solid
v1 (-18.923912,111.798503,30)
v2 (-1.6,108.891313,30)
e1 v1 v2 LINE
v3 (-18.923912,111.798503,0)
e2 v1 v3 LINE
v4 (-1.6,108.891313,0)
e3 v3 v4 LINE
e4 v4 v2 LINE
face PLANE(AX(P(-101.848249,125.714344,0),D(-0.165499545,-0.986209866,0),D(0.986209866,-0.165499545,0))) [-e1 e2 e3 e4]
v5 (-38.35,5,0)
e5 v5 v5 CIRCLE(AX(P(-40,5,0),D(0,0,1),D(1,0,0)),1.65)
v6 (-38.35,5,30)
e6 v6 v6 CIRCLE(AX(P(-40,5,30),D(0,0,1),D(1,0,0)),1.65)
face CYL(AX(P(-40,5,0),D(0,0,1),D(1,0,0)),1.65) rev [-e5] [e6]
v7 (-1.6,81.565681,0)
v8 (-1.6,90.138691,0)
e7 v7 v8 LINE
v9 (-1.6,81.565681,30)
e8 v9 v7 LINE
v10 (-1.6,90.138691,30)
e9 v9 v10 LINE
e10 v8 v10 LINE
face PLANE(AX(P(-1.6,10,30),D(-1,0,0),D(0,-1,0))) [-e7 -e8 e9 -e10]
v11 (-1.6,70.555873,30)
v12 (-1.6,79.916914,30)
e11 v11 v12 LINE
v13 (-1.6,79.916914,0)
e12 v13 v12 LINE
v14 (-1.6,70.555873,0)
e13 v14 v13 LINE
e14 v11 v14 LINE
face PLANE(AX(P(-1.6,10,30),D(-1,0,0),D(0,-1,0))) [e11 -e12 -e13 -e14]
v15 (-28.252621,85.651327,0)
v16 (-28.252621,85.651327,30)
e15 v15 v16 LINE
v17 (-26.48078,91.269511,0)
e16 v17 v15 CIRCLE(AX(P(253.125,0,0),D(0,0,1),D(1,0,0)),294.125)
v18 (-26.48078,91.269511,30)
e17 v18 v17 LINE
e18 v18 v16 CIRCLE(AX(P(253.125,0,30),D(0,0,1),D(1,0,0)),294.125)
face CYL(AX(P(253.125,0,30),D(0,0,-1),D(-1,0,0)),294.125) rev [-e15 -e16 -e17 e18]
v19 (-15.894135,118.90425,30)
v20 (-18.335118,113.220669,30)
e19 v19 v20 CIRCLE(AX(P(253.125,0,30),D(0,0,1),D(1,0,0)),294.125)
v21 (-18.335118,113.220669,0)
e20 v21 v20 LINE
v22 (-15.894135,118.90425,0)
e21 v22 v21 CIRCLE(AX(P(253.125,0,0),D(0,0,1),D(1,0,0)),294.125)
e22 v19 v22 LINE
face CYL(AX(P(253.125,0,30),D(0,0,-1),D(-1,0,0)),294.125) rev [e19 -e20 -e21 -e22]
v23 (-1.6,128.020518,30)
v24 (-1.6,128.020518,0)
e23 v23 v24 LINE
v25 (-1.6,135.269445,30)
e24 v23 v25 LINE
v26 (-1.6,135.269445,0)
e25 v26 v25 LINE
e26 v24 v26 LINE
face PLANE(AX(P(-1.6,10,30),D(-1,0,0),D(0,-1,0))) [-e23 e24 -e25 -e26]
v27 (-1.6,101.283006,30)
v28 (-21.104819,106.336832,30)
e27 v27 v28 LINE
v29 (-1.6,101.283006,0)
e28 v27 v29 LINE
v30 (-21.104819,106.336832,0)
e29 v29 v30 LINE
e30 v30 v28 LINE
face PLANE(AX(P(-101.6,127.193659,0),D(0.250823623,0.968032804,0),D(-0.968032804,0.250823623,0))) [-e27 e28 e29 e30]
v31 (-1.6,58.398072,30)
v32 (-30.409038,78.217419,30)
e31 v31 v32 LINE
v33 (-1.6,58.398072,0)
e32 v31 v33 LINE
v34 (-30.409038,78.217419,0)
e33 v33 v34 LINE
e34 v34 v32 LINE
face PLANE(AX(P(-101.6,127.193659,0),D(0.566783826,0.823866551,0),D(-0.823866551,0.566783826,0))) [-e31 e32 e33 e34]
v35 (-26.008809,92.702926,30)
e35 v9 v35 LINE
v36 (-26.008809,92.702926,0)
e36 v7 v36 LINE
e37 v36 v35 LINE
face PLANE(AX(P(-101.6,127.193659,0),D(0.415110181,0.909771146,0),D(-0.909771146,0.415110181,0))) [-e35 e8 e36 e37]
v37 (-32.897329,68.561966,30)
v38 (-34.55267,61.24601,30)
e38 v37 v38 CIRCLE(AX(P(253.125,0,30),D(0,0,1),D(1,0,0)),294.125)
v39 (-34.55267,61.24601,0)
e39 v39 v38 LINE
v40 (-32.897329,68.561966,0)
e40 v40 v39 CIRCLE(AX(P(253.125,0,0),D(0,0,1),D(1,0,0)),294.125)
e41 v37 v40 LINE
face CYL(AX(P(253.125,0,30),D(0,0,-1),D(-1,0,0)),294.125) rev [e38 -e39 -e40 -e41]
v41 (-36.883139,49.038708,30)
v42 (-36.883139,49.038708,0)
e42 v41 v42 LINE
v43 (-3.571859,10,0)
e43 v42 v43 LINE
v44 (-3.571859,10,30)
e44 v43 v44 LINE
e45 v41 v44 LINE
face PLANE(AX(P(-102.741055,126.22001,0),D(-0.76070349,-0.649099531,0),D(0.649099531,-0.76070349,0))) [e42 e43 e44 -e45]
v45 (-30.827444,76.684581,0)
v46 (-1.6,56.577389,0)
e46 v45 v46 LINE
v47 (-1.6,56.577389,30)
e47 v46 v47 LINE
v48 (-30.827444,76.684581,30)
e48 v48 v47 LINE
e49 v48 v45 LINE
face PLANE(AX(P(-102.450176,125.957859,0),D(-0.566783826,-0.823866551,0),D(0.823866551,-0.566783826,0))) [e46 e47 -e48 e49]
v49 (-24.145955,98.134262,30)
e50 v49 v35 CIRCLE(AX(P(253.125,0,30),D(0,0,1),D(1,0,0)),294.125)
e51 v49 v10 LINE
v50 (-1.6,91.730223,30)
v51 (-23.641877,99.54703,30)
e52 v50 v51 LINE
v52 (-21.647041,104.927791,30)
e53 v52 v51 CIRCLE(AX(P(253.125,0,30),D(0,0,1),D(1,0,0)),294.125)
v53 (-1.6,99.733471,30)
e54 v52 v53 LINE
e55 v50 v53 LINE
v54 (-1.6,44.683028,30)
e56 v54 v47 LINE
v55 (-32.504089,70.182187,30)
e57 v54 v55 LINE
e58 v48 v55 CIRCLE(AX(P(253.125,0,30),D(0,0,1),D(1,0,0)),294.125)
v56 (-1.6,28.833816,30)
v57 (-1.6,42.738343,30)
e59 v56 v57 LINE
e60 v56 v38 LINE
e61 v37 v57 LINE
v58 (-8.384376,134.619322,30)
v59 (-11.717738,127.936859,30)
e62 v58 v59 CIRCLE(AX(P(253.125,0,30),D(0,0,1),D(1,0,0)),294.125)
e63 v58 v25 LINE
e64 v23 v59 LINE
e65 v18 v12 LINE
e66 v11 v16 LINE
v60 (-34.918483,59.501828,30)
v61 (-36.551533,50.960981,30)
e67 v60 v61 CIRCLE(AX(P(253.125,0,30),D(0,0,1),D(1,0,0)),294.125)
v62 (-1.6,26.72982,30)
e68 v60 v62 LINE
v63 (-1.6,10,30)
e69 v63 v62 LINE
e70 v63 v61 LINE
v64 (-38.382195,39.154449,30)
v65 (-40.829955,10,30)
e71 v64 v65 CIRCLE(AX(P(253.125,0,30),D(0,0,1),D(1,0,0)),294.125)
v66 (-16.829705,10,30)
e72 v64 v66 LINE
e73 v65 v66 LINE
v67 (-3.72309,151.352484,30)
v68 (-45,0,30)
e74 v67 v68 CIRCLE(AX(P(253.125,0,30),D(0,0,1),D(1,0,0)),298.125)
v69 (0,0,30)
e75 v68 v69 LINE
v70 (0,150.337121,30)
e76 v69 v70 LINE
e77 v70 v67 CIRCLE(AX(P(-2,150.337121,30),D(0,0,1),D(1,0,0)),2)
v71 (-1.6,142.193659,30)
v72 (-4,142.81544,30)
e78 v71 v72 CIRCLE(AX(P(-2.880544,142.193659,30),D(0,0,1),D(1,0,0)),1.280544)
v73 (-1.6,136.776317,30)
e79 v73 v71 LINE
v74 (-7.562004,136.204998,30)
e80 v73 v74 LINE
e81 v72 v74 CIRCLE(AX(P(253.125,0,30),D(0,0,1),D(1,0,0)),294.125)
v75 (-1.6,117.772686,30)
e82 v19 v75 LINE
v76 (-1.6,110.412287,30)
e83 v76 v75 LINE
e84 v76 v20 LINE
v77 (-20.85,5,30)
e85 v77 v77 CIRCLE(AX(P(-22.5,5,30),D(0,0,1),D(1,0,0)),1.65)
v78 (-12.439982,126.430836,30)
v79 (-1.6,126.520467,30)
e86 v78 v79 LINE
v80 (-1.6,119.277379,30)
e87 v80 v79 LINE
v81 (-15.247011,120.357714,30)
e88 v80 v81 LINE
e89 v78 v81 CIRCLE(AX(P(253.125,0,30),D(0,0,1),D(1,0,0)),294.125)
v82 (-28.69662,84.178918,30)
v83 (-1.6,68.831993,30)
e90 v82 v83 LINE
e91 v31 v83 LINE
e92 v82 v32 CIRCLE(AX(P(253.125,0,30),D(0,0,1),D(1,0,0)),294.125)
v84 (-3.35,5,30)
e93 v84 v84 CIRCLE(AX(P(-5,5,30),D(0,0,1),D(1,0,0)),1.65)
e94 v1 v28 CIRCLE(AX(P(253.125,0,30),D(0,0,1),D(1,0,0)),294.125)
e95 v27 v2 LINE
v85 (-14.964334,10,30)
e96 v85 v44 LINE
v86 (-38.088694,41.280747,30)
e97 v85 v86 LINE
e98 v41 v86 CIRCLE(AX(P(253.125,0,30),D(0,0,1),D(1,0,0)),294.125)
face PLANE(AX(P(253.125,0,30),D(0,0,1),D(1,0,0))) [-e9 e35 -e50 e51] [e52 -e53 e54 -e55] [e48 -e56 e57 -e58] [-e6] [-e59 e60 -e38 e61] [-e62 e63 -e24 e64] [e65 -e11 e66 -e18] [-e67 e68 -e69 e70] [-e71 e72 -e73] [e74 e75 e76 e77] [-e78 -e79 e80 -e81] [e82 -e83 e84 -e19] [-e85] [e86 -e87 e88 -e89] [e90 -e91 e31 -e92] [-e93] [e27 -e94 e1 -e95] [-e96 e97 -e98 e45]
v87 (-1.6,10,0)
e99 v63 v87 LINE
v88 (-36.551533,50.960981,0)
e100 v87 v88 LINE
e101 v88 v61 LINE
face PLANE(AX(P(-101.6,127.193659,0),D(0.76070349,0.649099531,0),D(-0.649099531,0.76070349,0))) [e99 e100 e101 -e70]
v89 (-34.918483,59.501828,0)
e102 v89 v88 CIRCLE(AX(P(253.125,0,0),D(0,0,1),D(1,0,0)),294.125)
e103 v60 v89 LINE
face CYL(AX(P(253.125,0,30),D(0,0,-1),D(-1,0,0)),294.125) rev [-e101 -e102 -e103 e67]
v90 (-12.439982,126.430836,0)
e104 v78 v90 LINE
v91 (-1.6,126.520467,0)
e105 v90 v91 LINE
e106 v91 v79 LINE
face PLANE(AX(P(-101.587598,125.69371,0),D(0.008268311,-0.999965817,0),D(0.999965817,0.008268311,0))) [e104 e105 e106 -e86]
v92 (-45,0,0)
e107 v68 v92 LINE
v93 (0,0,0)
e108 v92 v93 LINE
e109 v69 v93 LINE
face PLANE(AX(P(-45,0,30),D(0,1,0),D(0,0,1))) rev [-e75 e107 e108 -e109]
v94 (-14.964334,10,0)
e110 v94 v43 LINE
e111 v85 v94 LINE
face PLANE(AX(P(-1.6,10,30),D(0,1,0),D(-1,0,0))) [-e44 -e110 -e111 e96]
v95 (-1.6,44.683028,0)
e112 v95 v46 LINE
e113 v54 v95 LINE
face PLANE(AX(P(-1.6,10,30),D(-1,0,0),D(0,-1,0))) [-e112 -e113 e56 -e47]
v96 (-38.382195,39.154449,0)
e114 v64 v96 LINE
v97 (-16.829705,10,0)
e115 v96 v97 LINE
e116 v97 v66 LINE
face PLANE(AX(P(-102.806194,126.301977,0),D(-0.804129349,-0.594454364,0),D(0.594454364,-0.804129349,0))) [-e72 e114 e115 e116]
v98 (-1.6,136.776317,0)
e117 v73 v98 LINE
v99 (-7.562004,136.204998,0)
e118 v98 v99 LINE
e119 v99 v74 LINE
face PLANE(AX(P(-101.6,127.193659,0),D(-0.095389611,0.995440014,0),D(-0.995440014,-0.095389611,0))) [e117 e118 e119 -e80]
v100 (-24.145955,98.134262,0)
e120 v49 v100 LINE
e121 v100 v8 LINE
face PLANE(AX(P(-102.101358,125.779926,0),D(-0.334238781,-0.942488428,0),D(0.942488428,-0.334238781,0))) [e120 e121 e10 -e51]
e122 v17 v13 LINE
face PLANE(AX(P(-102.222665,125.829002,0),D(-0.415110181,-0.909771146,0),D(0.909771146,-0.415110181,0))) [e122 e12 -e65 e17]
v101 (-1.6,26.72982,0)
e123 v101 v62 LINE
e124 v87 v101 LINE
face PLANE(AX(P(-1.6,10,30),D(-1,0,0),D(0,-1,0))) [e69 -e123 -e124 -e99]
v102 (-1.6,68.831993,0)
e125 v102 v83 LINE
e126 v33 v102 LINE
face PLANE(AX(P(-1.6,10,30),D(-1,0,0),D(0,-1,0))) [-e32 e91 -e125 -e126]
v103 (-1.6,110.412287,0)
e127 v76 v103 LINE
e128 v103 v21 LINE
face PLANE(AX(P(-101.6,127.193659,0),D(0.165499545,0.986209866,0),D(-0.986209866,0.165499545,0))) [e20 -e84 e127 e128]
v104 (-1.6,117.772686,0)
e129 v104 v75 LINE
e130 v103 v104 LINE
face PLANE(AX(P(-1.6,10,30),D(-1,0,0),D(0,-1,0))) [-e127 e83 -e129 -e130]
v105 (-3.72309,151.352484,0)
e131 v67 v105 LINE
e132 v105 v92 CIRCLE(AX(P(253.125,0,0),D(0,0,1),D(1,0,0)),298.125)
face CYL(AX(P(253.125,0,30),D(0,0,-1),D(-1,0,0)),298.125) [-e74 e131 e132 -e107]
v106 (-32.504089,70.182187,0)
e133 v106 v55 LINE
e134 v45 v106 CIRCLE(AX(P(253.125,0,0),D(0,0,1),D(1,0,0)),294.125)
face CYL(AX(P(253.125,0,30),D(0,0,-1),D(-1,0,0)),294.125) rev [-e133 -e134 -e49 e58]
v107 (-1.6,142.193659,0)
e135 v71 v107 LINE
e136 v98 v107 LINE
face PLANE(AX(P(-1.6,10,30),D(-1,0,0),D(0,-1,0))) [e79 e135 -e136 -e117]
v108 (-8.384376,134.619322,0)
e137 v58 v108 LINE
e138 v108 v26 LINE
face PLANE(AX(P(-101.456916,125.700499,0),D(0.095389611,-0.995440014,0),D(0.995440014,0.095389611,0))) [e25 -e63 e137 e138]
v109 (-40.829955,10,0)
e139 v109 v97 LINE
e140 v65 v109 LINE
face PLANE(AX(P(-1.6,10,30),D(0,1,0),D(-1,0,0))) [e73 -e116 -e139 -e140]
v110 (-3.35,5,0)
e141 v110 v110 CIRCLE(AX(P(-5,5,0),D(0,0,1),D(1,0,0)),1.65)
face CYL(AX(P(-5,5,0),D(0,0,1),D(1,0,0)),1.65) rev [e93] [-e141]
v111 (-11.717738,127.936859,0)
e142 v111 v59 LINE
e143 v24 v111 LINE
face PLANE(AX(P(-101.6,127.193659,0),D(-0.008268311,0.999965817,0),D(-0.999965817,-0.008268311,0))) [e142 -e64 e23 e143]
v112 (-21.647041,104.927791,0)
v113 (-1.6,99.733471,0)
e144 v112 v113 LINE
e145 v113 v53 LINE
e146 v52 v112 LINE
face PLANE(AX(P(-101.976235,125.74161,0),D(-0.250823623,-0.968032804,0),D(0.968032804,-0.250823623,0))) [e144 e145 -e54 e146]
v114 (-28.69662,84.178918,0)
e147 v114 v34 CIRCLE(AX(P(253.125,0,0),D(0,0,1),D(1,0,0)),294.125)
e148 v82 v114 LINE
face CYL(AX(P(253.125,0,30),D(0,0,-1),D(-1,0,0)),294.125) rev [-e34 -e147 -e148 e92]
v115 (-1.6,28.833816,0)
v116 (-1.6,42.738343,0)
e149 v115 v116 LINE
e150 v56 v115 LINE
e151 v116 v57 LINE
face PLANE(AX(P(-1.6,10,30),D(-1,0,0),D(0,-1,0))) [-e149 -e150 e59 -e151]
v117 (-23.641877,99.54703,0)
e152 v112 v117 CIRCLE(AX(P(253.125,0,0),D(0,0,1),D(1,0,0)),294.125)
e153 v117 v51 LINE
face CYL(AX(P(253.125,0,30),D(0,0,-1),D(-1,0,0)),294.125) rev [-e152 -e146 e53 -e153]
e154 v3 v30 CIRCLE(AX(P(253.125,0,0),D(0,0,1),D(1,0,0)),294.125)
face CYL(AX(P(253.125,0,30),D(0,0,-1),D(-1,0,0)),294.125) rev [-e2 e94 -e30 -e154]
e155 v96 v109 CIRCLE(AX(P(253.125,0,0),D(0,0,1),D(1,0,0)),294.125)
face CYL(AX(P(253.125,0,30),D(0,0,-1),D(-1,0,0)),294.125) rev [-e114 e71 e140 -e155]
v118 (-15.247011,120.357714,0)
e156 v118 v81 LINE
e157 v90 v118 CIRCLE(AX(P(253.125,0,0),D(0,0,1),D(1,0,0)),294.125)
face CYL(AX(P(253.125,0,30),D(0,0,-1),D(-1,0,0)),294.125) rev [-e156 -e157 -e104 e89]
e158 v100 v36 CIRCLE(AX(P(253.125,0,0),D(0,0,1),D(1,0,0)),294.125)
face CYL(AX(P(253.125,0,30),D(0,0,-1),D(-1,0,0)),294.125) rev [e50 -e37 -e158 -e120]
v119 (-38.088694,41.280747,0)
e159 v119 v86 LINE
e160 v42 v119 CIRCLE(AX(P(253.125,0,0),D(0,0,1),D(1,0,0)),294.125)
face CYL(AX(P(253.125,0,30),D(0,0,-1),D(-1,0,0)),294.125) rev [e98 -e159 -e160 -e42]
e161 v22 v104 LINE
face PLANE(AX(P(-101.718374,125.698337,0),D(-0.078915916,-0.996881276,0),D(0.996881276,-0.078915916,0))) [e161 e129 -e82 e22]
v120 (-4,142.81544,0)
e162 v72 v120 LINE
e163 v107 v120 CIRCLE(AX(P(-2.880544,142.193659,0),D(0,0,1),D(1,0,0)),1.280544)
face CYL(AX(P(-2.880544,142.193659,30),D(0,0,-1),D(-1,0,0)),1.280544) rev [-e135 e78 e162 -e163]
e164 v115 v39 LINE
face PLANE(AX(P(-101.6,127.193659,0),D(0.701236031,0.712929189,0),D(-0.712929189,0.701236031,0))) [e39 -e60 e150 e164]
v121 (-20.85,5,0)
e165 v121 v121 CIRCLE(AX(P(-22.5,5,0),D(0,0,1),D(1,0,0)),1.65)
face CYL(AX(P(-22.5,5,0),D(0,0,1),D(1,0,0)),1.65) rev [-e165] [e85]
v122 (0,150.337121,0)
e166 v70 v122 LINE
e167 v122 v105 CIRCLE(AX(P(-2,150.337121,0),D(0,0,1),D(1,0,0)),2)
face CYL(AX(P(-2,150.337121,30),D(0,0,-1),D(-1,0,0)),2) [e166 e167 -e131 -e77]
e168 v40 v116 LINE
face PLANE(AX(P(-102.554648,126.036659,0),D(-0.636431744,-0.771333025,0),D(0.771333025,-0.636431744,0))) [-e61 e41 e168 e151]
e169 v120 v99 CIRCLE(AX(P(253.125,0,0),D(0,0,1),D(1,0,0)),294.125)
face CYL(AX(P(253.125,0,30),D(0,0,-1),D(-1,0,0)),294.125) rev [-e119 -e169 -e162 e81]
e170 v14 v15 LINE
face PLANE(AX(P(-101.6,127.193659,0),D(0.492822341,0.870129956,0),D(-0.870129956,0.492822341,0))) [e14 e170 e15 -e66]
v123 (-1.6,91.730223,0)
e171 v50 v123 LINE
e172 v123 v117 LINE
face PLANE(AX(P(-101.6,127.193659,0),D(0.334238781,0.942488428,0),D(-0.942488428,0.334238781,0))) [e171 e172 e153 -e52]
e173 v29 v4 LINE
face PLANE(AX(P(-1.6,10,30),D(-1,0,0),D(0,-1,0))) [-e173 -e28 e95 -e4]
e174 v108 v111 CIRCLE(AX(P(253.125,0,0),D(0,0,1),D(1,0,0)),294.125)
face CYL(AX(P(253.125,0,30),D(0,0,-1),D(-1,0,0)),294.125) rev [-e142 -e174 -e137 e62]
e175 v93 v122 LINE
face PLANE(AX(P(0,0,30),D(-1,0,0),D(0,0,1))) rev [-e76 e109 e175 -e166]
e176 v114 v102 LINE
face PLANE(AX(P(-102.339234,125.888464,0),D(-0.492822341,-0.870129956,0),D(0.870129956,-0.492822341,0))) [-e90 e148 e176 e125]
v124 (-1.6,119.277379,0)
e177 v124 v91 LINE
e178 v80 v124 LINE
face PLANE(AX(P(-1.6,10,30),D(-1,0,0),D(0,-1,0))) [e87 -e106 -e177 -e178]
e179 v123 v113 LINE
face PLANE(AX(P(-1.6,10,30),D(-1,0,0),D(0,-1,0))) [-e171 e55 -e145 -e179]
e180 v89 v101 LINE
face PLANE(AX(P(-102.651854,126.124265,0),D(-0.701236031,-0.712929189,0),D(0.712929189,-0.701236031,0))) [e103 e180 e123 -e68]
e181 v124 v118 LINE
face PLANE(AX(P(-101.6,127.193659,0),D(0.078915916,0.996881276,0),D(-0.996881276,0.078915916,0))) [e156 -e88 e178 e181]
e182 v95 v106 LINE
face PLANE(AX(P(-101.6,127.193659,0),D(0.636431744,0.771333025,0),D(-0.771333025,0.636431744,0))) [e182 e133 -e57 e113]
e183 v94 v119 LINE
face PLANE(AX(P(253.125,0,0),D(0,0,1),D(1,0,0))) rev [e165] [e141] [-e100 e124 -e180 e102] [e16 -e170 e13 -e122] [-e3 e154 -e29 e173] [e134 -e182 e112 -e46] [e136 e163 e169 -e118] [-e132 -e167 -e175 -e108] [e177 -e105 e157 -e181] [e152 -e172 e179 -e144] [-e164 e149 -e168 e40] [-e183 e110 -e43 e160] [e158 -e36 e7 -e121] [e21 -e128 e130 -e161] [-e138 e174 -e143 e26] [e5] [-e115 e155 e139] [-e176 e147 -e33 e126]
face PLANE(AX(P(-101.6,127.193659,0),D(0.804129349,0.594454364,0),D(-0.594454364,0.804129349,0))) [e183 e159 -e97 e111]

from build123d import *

# Parameters (mm, degrees)
BOSS_EXTRUDE4_DEPTH = 30
SKETCH12_R          = 1.65
CUT_EXTRUDE1_DEPTH  = 162.652709488
BOSS_EXTRUDE5_DEPTH = 30
CIRPATTERN1_DEPTH   = 30
CUT_EXTRUDE2_START  = -30
CUT_EXTRUDE2_DEPTH  = 30


# Read off the part's stored shape, not the designer's step: CirPattern1
with BuildPart() as part:
    # Sketch5 → Boss-Extrude4 (new body)
    with BuildSketch(Plane.XY):
        with BuildLine():
            Line((0, 0), (0, 150.337121164))
            ThreePointArc((0, 150.337121164), (-1.473777529, 152.266652173), (-3.723089911, 151.352483739))
            ThreePointArc((-3.723089911, 151.352483739), (-34.4957159, 78.440037035), (-45, 0))
            Line((-45, 0), (0, 0))
        make_face()
        with BuildLine():
            Line((-1.6, 10), (-40.829955095, 10))
            ThreePointArc((-40.829955095, 10), (-30.304470107, 78.595490327), (-4, 142.815440342))
            ThreePointArc((-4, 142.815440342), (-2.559389376, 143.433276944), (-1.6, 142.193658833))
            Line((-1.6, 142.193658833), (-1.6, 10))
        make_face(mode=Mode.SUBTRACT)
    extrude(amount=BOSS_EXTRUDE4_DEPTH)

    # Sketch12 → Cut-Extrude1 (cut, through all)
    with BuildSketch(Plane.XY.offset(30)):
        with Locations((-40, 5)):
            Circle(SKETCH12_R)
        with Locations((-22.5, 5)):
            Circle(SKETCH12_R)
        with Locations((-5, 5)):
            Circle(SKETCH12_R)
    extrude(amount=-CUT_EXTRUDE1_DEPTH, mode=Mode.SUBTRACT)

    # Sketch13 → Boss-Extrude5 (add)
    with BuildSketch(Plane.XY.offset(30)):
        Polygon((-101.6, 127.193658833), (-1.6, 10), (-2.741055234, 9.026350704), (-102.741055234, 126.220009537), align=None)
    extrude(amount=-BOSS_EXTRUDE5_DEPTH)

    # CirPattern1 outline → CirPattern1 (add)
    with BuildSketch(Plane.XY):
        with BuildLine():
            Line((-101.6, 127.193658833), (-90.428627174, 114.101518276))
            Line((-90.428627174, 114.101518276), (-38.303740092, 62.831561128))
            ThreePointArc((-38.303740092, 62.831561128), (-38.115676892, 63.697596098), (-37.925040114, 64.563068197))
            Line((-37.925040114, 64.563068197), (-89.330082385, 115.124987119))
            Line((-89.330082385, 115.124987119), (-36.32594483, 71.390938936))
            ThreePointArc((-36.32594483, 71.390938936), (-36.125817446, 72.197508487), (-35.923442521, 73.003517048))
            Line((-35.923442521, 73.003517048), (-88.324919079, 116.240305842))
            Line((-88.324919079, 116.240305842), (-34.318662851, 79.086385123))
            ThreePointArc((-34.318662851, 79.086385123), (-34.107234191, 79.850856393), (-33.893772384, 80.614762447))
            Line((-33.893772384, 80.614762447), (-87.420787154, 117.438986195))
            Line((-87.420787154, 117.438986195), (-32.265940677, 86.200502345))
            ThreePointArc((-32.265940677, 86.200502345), (-32.04280883, 86.93581789), (-31.817782431, 87.670555864))
            Line((-31.817782431, 87.670555864), (-86.624567601, 118.711905496))
            Line((-86.624567601, 118.711905496), (-30.142720205, 92.940380431))
            ThreePointArc((-30.142720205, 92.940380431), (-29.906617894, 93.656921246), (-29.668703058, 94.372862284))
            Line((-29.668703058, 94.372862284), (-85.942320131, 120.049376062))
            Line((-85.942320131, 120.049376062), (-27.915909182, 99.471216899))
            ThreePointArc((-27.915909182, 99.471216899), (-27.664777337, 100.177924555), (-27.411868402, 100.883998196))
            Line((-27.411868402, 100.883998196), (-85.379237059, 121.441218934))
            Line((-85.379237059, 121.441218934), (-25.542932289, 105.93724151))
            ThreePointArc((-25.542932289, 105.93724151), (-25.273841569, 106.642396064), (-25.002966495, 107.346867111))
            Line((-25.002966495, 107.346867111), (-84.939603787, 122.876841346))
            Line((-84.939603787, 122.876841346), (-22.968102286, 112.477173218))
            ThreePointArc((-22.968102286, 112.477173218), (-22.677026174, 113.189036497), (-22.384114637, 113.900146519))
            Line((-22.384114637, 113.900146519), (-84.62676619, 124.345317346))
            Line((-84.62676619, 124.345317346), (-20.11610645, 119.238472696))
            ThreePointArc((-20.11610645, 119.238472696), (-19.797493538, 119.965945777), (-19.476943816, 120.692567512))
            Line((-19.476943816, 120.692567512), (-84.443105151, 125.835470945))
            Line((-84.443105151, 125.835470945), (-16.880634523, 126.394117549))
            ThreePointArc((-16.880634523, 126.394117549), (-16.526645472, 127.147574571), (-16.170553887, 127.900040194))
            Line((-16.170553887, 127.900040194), (-84.390018442, 127.335961174))
            Line((-84.390018442, 127.335961174), (-13.103676665, 134.167087417))
            ThreePointArc((-13.103676665, 134.167087417), (-12.702778891, 134.959651729), (-12.299521655, 135.751018152))
            Line((-12.299521655, 135.751018152), (-101.6, 127.193658833))
        make_face()
        with BuildLine():
            Line((-102.741055234, 126.220009537), (-101.6, 127.193658833))
            Line((-101.6, 127.193658833), (-102.806194023, 126.301977287))
            Line((-102.806194023, 126.301977287), (-41.773547865, 43.741994606))
            ThreePointArc((-41.773547865, 43.741994606), (-41.616374453, 44.788813456), (-41.455485097, 45.835067632))
            Line((-41.455485097, 45.835067632), (-88.817221598, 109.902159449))
            Line((-88.817221598, 109.902159449), (-102.741055234, 126.220009537))
        make_face()
        with BuildLine():
            ThreePointArc((-34.552670054, 61.246010298), (-34.736897582, 60.374196024), (-34.918483062, 59.501827625))
            Line((-34.918483062, 59.501827625), (-1.6, 26.729819964))
            Line((-1.6, 26.729819964), (-1.6, 28.833815738))
            Line((-1.6, 28.833815738), (-34.552670054, 61.246010298))
        make_face()
        with BuildLine():
            ThreePointArc((-32.504088687, 70.182186635), (-32.701856665, 69.372354972), (-32.897328567, 68.561966034))
            Line((-32.897328567, 68.561966034), (-1.6, 42.738342848))
            Line((-1.6, 42.738342848), (-1.6, 44.683028154))
            Line((-1.6, 44.683028154), (-32.504088687, 70.182186635))
        make_face()
        with BuildLine():
            ThreePointArc((-30.409038425, 78.217419283), (-30.619276495, 77.451282634), (-30.827444392, 76.684580908))
            Line((-30.827444392, 76.684580908), (-1.6, 56.57738912))
            Line((-1.6, 56.57738912), (-1.6, 58.398072333))
            Line((-1.6, 58.398072333), (-30.409038425, 78.217419283))
        make_face()
        with BuildLine():
            ThreePointArc((-28.252621221, 85.651327492), (-28.475582862, 84.915412953), (-28.696619797, 84.178918027))
            Line((-28.696619797, 84.178918027), (-1.6, 68.831992526))
            Line((-1.6, 68.831992526), (-1.6, 70.555872953))
            Line((-1.6, 70.555872953), (-28.252621221, 85.651327492))
        make_face()
        with BuildLine():
            ThreePointArc((-26.008808525, 92.702926401), (-26.245713404, 91.98652139), (-26.480779611, 91.269510972))
            Line((-26.480779611, 91.269510972), (-1.6, 79.916914254))
            Line((-1.6, 79.916914254), (-1.6, 81.565680547))
            Line((-1.6, 81.565680547), (-26.008808525, 92.702926401))
        make_face()
        with BuildLine():
            ThreePointArc((-23.641877477, 99.547029874), (-23.894816729, 98.840967037), (-24.145954739, 98.134261515))
            Line((-24.145954739, 98.134261515), (-1.6, 90.138691265))
            Line((-1.6, 90.138691265), (-1.6, 91.730222742))
            Line((-1.6, 91.730222742), (-23.641877477, 99.547029874))
        make_face()
        with BuildLine():
            ThreePointArc((-21.104819389, 106.336831732), (-21.376834174, 105.63265906), (-21.647040774, 104.92779057))
            Line((-21.647040774, 104.92779057), (-1.6, 99.733471356))
            Line((-1.6, 99.733471356), (-1.6, 101.283005621))
            Line((-1.6, 101.283005621), (-21.104819389, 106.336831732))
        make_face()
        with BuildLine():
            ThreePointArc((-18.335117992, 113.220669335), (-18.63044525, 112.509971124), (-18.923911862, 111.798502583))
            Line((-18.923911862, 111.798502583), (-1.6, 108.891312509))
            Line((-1.6, 108.891312509), (-1.6, 110.412286949))
            Line((-1.6, 110.412286949), (-18.335117992, 113.220669335))
        make_face()
        with BuildLine():
            ThreePointArc((-15.247010957, 120.35771417), (-15.571555811, 119.631419453), (-15.8941351, 118.90424961))
            Line((-15.8941351, 118.90424961), (-1.6, 117.772685809))
            Line((-1.6, 117.772685809), (-1.6, 119.27737853))
            Line((-1.6, 119.27737853), (-15.247010957, 120.35771417))
        make_face()
        with BuildLine():
            ThreePointArc((-11.717737877, 127.936858719), (-12.079928782, 127.184359789), (-12.439981613, 126.430835503))
            Line((-12.439981613, 126.430835503), (-1.6, 126.520466904))
            Line((-1.6, 126.520466904), (-1.6, 128.020518181))
            Line((-1.6, 128.020518181), (-11.717737877, 127.936858719))
        make_face()
        with BuildLine():
            ThreePointArc((-7.562004039, 136.204998257), (-7.974393837, 135.412784341), (-8.384376146, 134.61932184))
            Line((-8.384376146, 134.61932184), (-1.6, 135.269445395))
            Line((-1.6, 135.269445395), (-1.6, 136.776316706))
            Line((-1.6, 136.776316706), (-7.562004039, 136.204998257))
        make_face()
        Polygon((0, 27.260058248), (0, 25.156062475), (7.181716143, 18.092137745), (8.23357019, 19.161531528), align=None)
        Polygon((0, 136.929639232), (0, 135.422767921), (51.900153262, 140.396182044), (51.757068846, 141.889342065), align=None)
        Polygon((0, 128.03374793), (0, 126.533696654), (52.466714553, 126.967522588), (52.454312086, 128.467471313), align=None)
        Polygon((0, 119.150718045), (0, 117.646025324), (51.860735117, 113.540584165), (51.979108991, 115.035906079), align=None)
        Polygon((0, 110.143784999), (0, 108.622810558), (50.086826826, 100.217553884), (50.335076143, 101.696868684), align=None)
        Polygon((0, 100.868435169), (0, 99.318900904), (47.158490191, 87.099828051), (47.534725625, 88.551877257), align=None)
        Polygon((0, 91.162807764), (0, 89.571276287), (43.098011623, 74.287240479), (43.599369795, 75.700973121), align=None)
        Polygon((0, 80.835632895), (0, 79.186866601), (37.936293815, 61.877302697), (38.558959087, 63.241959415), align=None)
        Polygon((0, 69.649668379), (0, 67.925787952), (31.712620558, 49.964461824), (32.451854069, 51.269656757), align=None)
        Polygon((0, 57.297342949), (0, 55.476659736), (24.474357761, 38.639381772), (25.3245335, 39.875181599), align=None)
        Polygon((0, 43.362858063), (0, 41.418172757), (16.276592976, 27.988253239), (17.231240592, 29.145252777), align=None)
        with BuildLine():
            Line((-16.829705211, 10), (-14.964333673, 10))
            Line((-14.964333673, 10), (-38.088693922, 41.280747301))
            ThreePointArc((-38.088693922, 41.280747301), (-38.23738412, 40.217865998), (-38.382194992, 39.154449216))
            Line((-38.382194992, 39.154449216), (-16.829705211, 10))
        make_face()
    extrude(amount=CIRPATTERN1_DEPTH)

    # Sketch14 → Cut-Extrude2 (cut)
    with BuildSketch(Plane.XY.offset(30).offset(CUT_EXTRUDE2_START)):
        Polygon((-129.094046134, -17.289617226), (770.905953866, -20.358672888), (773.974831033, 879.588983489), (-141.374926706, 882.710382774), align=None)
        with BuildLine():
            Line((-45, 0), (0, 0))
            Line((0, 0), (0, 150.337121164))
            ThreePointArc((0, 150.337121164), (-1.473777529, 152.266652173), (-3.723089911, 151.352483739))
            ThreePointArc((-3.723089911, 151.352483739), (-34.4957159, 78.440037035), (-45, 0))
        make_face(mode=Mode.SUBTRACT)
    extrude(amount=CUT_EXTRUDE2_DEPTH, mode=Mode.SUBTRACT)


solid = part.part
